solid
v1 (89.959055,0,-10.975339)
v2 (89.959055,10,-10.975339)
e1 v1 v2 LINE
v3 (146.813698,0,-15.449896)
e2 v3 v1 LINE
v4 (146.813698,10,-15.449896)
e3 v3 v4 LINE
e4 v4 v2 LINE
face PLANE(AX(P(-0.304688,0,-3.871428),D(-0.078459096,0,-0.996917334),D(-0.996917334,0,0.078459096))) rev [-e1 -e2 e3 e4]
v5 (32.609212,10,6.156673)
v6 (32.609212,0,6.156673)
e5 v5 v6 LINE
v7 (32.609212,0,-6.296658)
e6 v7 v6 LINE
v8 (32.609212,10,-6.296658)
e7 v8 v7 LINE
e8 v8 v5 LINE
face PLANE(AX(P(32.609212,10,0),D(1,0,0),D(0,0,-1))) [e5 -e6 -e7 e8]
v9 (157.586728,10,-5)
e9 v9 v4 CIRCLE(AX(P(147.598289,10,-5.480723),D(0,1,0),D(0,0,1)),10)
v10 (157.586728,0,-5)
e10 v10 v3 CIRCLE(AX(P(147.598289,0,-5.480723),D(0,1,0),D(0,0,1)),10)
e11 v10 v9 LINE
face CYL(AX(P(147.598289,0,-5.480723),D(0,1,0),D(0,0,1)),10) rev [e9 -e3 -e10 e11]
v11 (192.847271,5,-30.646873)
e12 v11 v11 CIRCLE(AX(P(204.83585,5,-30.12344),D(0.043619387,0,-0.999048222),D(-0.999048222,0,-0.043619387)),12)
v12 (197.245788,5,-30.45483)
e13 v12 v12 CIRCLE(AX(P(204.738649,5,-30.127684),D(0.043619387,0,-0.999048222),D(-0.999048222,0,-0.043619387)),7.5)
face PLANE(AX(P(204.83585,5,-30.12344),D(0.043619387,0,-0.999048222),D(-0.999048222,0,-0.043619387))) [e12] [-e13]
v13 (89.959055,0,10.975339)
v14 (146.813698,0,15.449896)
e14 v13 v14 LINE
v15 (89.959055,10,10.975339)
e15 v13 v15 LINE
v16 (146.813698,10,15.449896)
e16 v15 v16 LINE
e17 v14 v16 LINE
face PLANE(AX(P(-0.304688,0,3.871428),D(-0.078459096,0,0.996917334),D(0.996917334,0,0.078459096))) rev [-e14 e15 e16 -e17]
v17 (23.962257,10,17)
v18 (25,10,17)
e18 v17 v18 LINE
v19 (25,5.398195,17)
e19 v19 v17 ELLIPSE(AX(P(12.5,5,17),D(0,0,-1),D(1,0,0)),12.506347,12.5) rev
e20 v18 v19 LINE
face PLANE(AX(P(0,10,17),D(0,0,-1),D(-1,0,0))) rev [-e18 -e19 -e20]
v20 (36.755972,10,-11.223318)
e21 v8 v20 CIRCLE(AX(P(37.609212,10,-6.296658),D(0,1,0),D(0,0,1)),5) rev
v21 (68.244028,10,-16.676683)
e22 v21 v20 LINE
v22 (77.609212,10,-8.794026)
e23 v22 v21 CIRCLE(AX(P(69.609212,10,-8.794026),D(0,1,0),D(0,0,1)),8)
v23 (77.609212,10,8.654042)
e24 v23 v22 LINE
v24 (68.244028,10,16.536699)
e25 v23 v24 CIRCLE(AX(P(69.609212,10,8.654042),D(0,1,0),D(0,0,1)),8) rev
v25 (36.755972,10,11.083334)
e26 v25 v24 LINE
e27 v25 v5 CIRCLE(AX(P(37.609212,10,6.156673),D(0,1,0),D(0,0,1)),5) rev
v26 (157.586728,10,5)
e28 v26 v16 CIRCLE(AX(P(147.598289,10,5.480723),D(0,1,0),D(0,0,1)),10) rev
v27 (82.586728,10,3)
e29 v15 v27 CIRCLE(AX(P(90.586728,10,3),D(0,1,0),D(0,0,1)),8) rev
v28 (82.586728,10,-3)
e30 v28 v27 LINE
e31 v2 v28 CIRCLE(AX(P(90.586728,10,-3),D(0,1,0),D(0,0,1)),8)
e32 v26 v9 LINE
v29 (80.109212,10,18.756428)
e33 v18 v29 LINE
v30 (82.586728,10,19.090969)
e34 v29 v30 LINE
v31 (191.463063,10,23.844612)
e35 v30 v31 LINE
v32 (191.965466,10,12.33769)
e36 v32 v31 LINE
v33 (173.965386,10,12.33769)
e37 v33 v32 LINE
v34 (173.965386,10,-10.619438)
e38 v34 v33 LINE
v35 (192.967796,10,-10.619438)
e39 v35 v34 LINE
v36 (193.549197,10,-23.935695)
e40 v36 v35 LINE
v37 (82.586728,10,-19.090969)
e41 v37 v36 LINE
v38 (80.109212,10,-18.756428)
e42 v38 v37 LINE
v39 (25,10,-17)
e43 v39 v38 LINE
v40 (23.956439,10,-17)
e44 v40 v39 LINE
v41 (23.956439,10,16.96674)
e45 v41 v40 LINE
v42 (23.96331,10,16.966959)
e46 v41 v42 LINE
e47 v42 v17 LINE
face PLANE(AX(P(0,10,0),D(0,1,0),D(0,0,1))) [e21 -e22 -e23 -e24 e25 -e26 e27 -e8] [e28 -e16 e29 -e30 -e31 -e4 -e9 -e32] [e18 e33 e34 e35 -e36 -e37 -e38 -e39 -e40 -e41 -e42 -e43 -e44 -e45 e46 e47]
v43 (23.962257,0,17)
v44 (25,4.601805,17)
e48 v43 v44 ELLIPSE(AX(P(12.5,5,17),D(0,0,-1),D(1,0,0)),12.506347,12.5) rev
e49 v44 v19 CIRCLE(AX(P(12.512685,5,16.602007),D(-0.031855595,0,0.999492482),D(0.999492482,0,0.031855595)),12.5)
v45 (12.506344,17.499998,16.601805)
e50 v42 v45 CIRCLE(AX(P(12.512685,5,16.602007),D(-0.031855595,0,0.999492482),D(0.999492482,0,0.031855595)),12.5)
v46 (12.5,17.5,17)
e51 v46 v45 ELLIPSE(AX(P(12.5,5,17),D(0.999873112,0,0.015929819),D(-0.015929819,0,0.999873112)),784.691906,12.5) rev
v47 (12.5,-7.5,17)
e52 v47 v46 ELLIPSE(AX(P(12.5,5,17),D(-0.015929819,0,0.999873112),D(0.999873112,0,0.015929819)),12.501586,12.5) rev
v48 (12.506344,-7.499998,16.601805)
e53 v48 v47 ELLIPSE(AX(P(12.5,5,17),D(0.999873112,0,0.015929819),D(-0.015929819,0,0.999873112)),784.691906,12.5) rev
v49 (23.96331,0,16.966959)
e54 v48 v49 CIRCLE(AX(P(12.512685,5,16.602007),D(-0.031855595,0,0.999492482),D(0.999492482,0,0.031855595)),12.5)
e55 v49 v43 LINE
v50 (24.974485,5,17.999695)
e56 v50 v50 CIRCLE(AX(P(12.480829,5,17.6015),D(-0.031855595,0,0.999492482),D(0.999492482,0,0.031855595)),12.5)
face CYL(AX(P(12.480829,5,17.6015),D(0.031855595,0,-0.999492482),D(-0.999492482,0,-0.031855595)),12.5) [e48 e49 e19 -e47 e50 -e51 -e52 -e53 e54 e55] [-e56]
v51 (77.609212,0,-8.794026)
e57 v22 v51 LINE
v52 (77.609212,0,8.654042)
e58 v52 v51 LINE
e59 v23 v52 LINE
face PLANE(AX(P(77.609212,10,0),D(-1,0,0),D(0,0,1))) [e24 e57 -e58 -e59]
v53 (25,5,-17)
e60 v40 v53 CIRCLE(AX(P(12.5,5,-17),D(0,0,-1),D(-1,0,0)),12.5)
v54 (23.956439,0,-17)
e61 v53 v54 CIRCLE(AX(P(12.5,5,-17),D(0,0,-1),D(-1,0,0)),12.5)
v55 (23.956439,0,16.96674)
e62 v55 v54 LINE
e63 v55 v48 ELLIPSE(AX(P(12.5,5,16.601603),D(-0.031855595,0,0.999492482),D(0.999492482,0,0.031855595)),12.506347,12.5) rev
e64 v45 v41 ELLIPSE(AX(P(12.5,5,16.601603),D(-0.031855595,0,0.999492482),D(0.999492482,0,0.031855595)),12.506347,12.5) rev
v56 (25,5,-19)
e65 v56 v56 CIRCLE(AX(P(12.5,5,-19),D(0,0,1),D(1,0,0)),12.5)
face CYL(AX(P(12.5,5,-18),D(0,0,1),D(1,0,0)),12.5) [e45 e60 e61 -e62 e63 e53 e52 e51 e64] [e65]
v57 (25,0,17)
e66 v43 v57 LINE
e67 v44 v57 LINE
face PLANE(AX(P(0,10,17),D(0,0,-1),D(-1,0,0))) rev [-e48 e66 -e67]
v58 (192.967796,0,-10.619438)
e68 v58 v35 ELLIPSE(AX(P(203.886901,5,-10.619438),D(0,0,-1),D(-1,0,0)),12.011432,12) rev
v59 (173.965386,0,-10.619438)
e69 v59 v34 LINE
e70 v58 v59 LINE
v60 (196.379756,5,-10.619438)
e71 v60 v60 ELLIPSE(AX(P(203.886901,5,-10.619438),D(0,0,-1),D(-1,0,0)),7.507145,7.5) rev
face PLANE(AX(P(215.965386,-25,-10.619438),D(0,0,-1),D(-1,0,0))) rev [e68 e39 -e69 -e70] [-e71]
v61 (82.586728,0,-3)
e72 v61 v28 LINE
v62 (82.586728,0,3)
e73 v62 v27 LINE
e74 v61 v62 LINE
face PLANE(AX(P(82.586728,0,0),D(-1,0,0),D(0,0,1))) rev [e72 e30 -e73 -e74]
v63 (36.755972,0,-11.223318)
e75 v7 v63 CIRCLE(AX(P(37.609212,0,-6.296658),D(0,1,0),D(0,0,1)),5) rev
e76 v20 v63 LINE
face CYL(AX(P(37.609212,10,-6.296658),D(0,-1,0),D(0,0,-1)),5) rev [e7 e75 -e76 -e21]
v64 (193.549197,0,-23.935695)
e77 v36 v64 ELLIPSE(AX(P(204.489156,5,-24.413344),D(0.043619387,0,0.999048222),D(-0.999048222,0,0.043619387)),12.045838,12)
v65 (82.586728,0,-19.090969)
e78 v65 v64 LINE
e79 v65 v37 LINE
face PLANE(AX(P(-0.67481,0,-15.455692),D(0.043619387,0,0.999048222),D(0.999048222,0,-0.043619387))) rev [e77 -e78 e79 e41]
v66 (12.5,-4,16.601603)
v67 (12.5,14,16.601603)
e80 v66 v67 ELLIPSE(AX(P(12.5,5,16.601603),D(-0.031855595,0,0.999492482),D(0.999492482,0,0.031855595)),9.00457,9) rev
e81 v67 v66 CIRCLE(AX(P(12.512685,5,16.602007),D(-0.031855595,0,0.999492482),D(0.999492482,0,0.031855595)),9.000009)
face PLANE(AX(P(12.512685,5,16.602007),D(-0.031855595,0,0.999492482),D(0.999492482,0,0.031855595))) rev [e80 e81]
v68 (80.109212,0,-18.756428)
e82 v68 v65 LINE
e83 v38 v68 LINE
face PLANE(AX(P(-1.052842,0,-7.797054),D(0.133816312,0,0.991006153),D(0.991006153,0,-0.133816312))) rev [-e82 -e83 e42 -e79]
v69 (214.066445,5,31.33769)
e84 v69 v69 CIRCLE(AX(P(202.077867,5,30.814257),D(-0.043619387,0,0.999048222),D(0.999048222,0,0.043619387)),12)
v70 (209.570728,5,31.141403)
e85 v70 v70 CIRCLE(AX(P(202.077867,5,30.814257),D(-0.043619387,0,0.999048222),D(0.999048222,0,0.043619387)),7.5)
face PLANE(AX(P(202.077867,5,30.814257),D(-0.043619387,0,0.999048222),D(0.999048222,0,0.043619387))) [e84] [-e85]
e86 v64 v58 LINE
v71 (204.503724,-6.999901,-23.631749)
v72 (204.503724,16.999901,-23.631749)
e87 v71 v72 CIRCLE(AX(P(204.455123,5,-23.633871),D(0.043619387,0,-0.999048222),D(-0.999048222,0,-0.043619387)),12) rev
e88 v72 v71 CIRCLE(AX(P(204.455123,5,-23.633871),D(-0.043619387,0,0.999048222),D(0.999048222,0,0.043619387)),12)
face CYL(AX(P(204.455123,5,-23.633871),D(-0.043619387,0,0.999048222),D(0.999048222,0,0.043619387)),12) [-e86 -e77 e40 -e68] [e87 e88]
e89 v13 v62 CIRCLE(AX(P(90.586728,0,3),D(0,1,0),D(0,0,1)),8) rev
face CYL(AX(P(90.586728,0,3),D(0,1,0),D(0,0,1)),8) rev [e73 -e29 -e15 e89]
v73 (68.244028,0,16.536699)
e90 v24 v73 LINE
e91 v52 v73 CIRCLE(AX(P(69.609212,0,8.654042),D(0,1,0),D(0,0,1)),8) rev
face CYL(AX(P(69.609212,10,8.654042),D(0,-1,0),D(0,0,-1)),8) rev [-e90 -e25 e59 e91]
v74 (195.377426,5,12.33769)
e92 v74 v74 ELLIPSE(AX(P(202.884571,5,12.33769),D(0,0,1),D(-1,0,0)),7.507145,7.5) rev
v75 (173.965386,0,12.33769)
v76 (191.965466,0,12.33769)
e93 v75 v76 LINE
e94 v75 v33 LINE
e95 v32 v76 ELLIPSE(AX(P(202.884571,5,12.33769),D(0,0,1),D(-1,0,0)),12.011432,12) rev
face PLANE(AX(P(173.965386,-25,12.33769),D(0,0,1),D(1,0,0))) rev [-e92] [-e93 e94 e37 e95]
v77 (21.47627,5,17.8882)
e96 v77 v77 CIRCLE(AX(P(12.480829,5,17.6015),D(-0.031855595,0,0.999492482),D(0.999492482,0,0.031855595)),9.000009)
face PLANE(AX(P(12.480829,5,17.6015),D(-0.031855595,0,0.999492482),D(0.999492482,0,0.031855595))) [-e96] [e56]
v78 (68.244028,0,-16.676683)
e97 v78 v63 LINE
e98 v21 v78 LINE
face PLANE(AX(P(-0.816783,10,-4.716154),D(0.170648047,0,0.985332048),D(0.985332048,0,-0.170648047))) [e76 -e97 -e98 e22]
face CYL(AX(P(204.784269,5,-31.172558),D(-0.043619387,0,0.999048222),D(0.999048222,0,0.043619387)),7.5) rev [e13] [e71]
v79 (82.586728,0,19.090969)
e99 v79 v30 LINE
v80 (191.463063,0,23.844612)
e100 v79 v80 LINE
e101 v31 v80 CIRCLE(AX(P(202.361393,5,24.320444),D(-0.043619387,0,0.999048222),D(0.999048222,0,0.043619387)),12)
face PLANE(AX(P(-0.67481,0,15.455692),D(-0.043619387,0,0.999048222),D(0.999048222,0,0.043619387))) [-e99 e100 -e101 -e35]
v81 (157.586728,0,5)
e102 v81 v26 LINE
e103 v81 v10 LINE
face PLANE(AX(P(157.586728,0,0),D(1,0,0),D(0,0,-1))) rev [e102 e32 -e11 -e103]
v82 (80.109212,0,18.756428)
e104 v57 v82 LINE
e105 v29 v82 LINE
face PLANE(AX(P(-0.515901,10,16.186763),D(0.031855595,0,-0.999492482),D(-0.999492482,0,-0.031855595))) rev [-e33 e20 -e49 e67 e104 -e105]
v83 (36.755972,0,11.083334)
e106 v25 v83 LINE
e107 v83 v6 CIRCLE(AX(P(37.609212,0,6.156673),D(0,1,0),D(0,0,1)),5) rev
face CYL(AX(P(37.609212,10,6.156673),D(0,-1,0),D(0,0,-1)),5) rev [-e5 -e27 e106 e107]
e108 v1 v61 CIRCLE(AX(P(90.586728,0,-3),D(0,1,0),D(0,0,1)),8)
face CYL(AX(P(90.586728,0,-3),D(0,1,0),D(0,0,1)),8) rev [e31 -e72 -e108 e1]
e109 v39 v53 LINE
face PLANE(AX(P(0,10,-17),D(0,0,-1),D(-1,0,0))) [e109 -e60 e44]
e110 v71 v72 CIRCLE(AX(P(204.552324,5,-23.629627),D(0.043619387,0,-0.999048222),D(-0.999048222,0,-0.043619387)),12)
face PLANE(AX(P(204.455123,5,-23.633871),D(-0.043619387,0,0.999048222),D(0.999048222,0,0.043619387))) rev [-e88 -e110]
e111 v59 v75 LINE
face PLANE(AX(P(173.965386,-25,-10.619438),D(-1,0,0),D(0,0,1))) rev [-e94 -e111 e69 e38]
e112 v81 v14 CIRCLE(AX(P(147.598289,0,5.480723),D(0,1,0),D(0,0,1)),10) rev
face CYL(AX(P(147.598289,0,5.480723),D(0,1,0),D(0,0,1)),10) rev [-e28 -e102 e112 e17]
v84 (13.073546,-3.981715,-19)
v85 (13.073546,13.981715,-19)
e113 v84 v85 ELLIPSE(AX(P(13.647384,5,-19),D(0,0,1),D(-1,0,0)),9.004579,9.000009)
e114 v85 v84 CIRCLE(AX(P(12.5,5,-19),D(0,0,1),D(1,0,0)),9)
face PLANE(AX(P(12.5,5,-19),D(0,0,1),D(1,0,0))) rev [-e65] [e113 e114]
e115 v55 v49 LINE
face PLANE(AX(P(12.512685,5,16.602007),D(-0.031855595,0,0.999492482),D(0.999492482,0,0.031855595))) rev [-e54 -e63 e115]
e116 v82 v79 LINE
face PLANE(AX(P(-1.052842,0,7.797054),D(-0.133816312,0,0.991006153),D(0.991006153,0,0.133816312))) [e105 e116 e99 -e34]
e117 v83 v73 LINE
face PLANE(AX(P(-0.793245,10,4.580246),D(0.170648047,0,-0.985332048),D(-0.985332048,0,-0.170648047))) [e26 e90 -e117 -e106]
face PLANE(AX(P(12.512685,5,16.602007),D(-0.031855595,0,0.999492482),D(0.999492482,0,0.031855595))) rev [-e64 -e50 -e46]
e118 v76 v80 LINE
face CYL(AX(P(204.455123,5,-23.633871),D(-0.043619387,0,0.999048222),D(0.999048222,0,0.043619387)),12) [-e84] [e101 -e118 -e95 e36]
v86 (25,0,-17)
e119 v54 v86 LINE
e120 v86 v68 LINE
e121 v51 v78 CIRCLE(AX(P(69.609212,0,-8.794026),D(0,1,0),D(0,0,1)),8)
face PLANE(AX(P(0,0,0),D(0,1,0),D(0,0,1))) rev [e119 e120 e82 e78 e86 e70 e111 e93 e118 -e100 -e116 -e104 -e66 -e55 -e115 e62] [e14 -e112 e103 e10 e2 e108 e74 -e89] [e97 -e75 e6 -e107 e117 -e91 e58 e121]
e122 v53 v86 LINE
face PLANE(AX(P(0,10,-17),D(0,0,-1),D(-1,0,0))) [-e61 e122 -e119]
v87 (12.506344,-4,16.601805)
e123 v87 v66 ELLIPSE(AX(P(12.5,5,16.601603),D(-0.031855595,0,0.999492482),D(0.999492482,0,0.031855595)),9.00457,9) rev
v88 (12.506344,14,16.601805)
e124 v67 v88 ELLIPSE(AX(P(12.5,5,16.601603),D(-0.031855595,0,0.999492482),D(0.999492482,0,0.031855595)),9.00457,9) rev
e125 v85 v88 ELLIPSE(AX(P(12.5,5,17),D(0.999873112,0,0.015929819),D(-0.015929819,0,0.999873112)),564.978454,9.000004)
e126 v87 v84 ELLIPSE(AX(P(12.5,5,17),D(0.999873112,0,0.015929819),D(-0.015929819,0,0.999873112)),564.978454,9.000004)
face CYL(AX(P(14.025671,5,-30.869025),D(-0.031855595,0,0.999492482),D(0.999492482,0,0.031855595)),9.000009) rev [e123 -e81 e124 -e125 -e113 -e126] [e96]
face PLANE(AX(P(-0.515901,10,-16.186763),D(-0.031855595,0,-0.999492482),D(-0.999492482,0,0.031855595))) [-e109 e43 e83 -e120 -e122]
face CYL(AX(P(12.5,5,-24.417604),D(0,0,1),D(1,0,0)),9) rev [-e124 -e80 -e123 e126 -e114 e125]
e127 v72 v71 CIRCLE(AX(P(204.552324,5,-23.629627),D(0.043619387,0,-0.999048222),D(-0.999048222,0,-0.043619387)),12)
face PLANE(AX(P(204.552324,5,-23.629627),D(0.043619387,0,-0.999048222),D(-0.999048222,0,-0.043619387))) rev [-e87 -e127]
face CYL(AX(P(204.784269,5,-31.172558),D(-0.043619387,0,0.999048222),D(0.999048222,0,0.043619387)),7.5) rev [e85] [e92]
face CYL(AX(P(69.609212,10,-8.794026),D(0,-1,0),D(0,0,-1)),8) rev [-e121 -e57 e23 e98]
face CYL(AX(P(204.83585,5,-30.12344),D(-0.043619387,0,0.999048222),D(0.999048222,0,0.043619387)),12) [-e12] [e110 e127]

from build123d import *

# Parameters (mm, degrees)
BOSS_EXTRUDE6_DEPTH  = 10
BOSS_EXTRUDE7_DEPTH  = 10
BOSS_EXTRUDE9_DEPTH  = 10
SKETCH19_R           = 12.5
BOSS_EXTRUDE10_DEPTH = 35
SKETCH20_W           = 1.043560763
SKETCH20_H           = 10
CUT_EXTRUDE3_DEPTH   = 210.469322495
SKETCH21_R           = 12.5
BOSS_EXTRUDE11_DEPTH = 36
SKETCH22_R           = 9
CUT_EXTRUDE4_DEPTH   = 210.469322495
SKETCH23_R           = 12
BOSS_EXTRUDE12_DEPTH = 48
SKETCH24_R           = 12.5
BOSS_EXTRUDE13_DEPTH = 1
SKETCH25_R           = 9.000008948
CUT_EXTRUDE5_DEPTH   = 222.635791619
BOSS_EXTRUDE14_START = 6.5
SKETCH26_R           = 12
BOSS_EXTRUDE14_DEPTH = 6.5
SKETCH27_R           = 12
BOSS_EXTRUDE15_DEPTH = 6.5
SKETCH29_R           = 7.5
CUT_EXTRUDE6_DEPTH   = 225.72641495
CUT_EXTRUDE8_DEPTH   = 35


with BuildPart() as part:
    # Sketch16 → Boss-Extrude6 (new body)
    with BuildSketch(Plane(origin=(0, 0, 0), x_dir=(1, 0, 0), z_dir=(0, 1, 0))):
        Polygon((0, 17), (0, -17), (25, -17), (80.109212305, -18.756428184), (80.109212305, 18.756428184), (25, 17), align=None)
        with BuildLine():
            Line((77.609212305, 8.794026491), (77.609212305, -8.65404217))
            ThreePointArc((77.609212305, -8.65404217), (74.760839475, -14.774559918), (68.24402793, -16.536698551))
            Line((68.24402793, -16.536698551), (36.75597207, -11.083333621))
            ThreePointArc((36.75597207, -11.083333621), (33.783888713, -9.376440364), (32.609212305, -6.156673383))
            Line((32.609212305, -6.156673383), (32.609212305, 6.296657704))
            ThreePointArc((32.609212305, 6.296657704), (33.783888713, 9.516424685), (36.75597207, 11.223317942))
            Line((36.75597207, 11.223317942), (68.24402793, 16.676682872))
            ThreePointArc((68.24402793, 16.676682872), (74.760839475, 14.914544239), (77.609212305, 8.794026491))
        make_face(mode=Mode.SUBTRACT)
    extrude(amount=BOSS_EXTRUDE6_DEPTH)

    # Sketch17 → Boss-Extrude7 (add)
    with BuildSketch(Plane(origin=(0, 10, 0), x_dir=(1, 0, 0), z_dir=(0, 1, 0))):
        Polygon((82.586727687, 19.090968963), (80.109212305, 18.756428184), (80.109212305, -18.756428184), (82.586727687, -19.090968963), (162.586727687, -22.583844395), (162.586727687, 22.583844395), align=None)
        with BuildLine():
            Line((157.586727687, 5), (157.586727687, -5))
            ThreePointArc((157.586727687, -5), (154.560888112, -12.658620458), (146.813698133, -15.449896132))
            Line((146.813698133, -15.449896132), (89.959054921, -10.97533867))
            ThreePointArc((89.959054921, -10.97533867), (84.712147611, -8.430405964), (82.586727687, -3))
            Line((82.586727687, -3), (82.586727687, 3))
            ThreePointArc((82.586727687, 3), (84.712147611, 8.430405964), (89.959054921, 10.97533867))
            Line((89.959054921, 10.97533867), (146.813698133, 15.449896132))
            ThreePointArc((146.813698133, 15.449896132), (154.560888112, 12.658620458), (157.586727687, 5))
        make_face(mode=Mode.SUBTRACT)
    extrude(amount=-BOSS_EXTRUDE7_DEPTH)

    # Sketch18 → Boss-Extrude9 (add)
    with BuildSketch(Plane(origin=(0, 10, 0), x_dir=(1, 0, 0), z_dir=(0, 1, 0))):
        Polygon((162.586727687, 22.583844395), (204.586727687, 24.417603998), (204.586727687, -24.417603998), (162.586727687, -22.583844395), align=None)
    extrude(amount=-BOSS_EXTRUDE9_DEPTH)

    # Sketch19 → Boss-Extrude10 (add)
    with BuildSketch(Plane.XY.offset(17)):
        with Locations((12.5, 5)):
            Circle(SKETCH19_R)
    extrude(amount=-BOSS_EXTRUDE10_DEPTH)

    # Sketch20 → Cut-Extrude3 (cut, through all)
    with BuildSketch(Plane.XY.offset(17)):
        with Locations((0.521780382, 5)):
            Rectangle(SKETCH20_W, SKETCH20_H)
    extrude(amount=-CUT_EXTRUDE3_DEPTH, mode=Mode.SUBTRACT)

    # Sketch21 → Boss-Extrude11 (add)
    with BuildSketch(Plane.XY.offset(17)):
        with Locations((12.5, 5)):
            Circle(SKETCH21_R)
    extrude(amount=-BOSS_EXTRUDE11_DEPTH)

    # Sketch22 → Cut-Extrude4 (cut, through all)
    with BuildSketch(Plane.XY.offset(17)):
        with Locations((12.5, 5)):
            Circle(SKETCH22_R)
    extrude(amount=-CUT_EXTRUDE4_DEPTH, mode=Mode.SUBTRACT)

    # Sketch23 → Boss-Extrude12 (add)
    with BuildSketch(Plane(origin=(-0.674810074, 0, 15.455691716), x_dir=(0.9990482215818578, 0, 0.04361938736533612), z_dir=(-0.04361938736533611, 0, 0.9990482215818577))):
        with Locations((203.229632355, 5)):
            Circle(SKETCH23_R)
    extrude(amount=-BOSS_EXTRUDE12_DEPTH)

    # Sketch24 → Boss-Extrude13 (add)
    with BuildSketch(Plane(origin=(-0.515900802, 0, 16.186763058), x_dir=(0.9994924817365809, 0, 0.03185559530208948), z_dir=(-0.03185559530208948, 0, 0.9994924817365809))):
        with Locations((13.035201142, 5)):
            Circle(SKETCH24_R)
    extrude(amount=BOSS_EXTRUDE13_DEPTH)

    # Sketch25 → Cut-Extrude5 (cut, through all)
    with BuildSketch(Plane(origin=(-0.547756398, 0, 17.186255539), x_dir=(0.9994924817365809, 0, 0.03185559530208948), z_dir=(-0.03185559530208948, 0, 0.9994924817365809))):
        with Locations((13.035201142, 5)):
            Circle(SKETCH25_R)
    extrude(amount=-CUT_EXTRUDE5_DEPTH, mode=Mode.SUBTRACT)

    # Sketch26 → Boss-Extrude14 (add)
    with BuildSketch(Plane(origin=(-0.674810074, 0, 15.455691716), x_dir=(0.9990482215818578, 0, 0.04361938736533612), z_dir=(-0.04361938736533611, 0, 0.9990482215818577)).offset(BOSS_EXTRUDE14_START)):
        with Locations((203.229632355, 5)):
            Circle(SKETCH26_R)
    extrude(amount=-BOSS_EXTRUDE14_DEPTH)

    # Sketch27 → Boss-Extrude15 (add)
    with BuildSketch(Plane(origin=(1.41892052, 0, -32.49862292), x_dir=(-0.9990482215818578, 0, -0.04361938736533613), z_dir=(0.043619387365336125, 0, -0.9990482215818577))):
        with Locations((-203.326925527, 5)):
            Circle(SKETCH27_R)
    extrude(amount=BOSS_EXTRUDE15_DEPTH)

    # Sketch29 → Cut-Extrude6 (cut, through all)
    with BuildSketch(Plane(origin=(-0.958336092, 0, 21.949505156), x_dir=(0.9990482215818578, 0, 0.04361938736533613), z_dir=(-0.043619387365336125, 0, 0.9990482215818577))):
        with Locations((203.229632355, 5)):
            Circle(SKETCH29_R)
    extrude(amount=-CUT_EXTRUDE6_DEPTH, mode=Mode.SUBTRACT)

    # Sketch30 → Cut-Extrude8 (cut, symmetric)
    with BuildSketch(Plane(origin=(0, 10, 0), x_dir=(1, 0, 0), z_dir=(0, 1, 0))):
        Polygon((215.96538569, 10.619437579), (173.96538569, 10.619437579), (173.96538569, -12.337689863), (215.170754227, -12.337689863), align=None)
    extrude(amount=CUT_EXTRUDE8_DEPTH, both=True, mode=Mode.SUBTRACT)


solid = part.part
